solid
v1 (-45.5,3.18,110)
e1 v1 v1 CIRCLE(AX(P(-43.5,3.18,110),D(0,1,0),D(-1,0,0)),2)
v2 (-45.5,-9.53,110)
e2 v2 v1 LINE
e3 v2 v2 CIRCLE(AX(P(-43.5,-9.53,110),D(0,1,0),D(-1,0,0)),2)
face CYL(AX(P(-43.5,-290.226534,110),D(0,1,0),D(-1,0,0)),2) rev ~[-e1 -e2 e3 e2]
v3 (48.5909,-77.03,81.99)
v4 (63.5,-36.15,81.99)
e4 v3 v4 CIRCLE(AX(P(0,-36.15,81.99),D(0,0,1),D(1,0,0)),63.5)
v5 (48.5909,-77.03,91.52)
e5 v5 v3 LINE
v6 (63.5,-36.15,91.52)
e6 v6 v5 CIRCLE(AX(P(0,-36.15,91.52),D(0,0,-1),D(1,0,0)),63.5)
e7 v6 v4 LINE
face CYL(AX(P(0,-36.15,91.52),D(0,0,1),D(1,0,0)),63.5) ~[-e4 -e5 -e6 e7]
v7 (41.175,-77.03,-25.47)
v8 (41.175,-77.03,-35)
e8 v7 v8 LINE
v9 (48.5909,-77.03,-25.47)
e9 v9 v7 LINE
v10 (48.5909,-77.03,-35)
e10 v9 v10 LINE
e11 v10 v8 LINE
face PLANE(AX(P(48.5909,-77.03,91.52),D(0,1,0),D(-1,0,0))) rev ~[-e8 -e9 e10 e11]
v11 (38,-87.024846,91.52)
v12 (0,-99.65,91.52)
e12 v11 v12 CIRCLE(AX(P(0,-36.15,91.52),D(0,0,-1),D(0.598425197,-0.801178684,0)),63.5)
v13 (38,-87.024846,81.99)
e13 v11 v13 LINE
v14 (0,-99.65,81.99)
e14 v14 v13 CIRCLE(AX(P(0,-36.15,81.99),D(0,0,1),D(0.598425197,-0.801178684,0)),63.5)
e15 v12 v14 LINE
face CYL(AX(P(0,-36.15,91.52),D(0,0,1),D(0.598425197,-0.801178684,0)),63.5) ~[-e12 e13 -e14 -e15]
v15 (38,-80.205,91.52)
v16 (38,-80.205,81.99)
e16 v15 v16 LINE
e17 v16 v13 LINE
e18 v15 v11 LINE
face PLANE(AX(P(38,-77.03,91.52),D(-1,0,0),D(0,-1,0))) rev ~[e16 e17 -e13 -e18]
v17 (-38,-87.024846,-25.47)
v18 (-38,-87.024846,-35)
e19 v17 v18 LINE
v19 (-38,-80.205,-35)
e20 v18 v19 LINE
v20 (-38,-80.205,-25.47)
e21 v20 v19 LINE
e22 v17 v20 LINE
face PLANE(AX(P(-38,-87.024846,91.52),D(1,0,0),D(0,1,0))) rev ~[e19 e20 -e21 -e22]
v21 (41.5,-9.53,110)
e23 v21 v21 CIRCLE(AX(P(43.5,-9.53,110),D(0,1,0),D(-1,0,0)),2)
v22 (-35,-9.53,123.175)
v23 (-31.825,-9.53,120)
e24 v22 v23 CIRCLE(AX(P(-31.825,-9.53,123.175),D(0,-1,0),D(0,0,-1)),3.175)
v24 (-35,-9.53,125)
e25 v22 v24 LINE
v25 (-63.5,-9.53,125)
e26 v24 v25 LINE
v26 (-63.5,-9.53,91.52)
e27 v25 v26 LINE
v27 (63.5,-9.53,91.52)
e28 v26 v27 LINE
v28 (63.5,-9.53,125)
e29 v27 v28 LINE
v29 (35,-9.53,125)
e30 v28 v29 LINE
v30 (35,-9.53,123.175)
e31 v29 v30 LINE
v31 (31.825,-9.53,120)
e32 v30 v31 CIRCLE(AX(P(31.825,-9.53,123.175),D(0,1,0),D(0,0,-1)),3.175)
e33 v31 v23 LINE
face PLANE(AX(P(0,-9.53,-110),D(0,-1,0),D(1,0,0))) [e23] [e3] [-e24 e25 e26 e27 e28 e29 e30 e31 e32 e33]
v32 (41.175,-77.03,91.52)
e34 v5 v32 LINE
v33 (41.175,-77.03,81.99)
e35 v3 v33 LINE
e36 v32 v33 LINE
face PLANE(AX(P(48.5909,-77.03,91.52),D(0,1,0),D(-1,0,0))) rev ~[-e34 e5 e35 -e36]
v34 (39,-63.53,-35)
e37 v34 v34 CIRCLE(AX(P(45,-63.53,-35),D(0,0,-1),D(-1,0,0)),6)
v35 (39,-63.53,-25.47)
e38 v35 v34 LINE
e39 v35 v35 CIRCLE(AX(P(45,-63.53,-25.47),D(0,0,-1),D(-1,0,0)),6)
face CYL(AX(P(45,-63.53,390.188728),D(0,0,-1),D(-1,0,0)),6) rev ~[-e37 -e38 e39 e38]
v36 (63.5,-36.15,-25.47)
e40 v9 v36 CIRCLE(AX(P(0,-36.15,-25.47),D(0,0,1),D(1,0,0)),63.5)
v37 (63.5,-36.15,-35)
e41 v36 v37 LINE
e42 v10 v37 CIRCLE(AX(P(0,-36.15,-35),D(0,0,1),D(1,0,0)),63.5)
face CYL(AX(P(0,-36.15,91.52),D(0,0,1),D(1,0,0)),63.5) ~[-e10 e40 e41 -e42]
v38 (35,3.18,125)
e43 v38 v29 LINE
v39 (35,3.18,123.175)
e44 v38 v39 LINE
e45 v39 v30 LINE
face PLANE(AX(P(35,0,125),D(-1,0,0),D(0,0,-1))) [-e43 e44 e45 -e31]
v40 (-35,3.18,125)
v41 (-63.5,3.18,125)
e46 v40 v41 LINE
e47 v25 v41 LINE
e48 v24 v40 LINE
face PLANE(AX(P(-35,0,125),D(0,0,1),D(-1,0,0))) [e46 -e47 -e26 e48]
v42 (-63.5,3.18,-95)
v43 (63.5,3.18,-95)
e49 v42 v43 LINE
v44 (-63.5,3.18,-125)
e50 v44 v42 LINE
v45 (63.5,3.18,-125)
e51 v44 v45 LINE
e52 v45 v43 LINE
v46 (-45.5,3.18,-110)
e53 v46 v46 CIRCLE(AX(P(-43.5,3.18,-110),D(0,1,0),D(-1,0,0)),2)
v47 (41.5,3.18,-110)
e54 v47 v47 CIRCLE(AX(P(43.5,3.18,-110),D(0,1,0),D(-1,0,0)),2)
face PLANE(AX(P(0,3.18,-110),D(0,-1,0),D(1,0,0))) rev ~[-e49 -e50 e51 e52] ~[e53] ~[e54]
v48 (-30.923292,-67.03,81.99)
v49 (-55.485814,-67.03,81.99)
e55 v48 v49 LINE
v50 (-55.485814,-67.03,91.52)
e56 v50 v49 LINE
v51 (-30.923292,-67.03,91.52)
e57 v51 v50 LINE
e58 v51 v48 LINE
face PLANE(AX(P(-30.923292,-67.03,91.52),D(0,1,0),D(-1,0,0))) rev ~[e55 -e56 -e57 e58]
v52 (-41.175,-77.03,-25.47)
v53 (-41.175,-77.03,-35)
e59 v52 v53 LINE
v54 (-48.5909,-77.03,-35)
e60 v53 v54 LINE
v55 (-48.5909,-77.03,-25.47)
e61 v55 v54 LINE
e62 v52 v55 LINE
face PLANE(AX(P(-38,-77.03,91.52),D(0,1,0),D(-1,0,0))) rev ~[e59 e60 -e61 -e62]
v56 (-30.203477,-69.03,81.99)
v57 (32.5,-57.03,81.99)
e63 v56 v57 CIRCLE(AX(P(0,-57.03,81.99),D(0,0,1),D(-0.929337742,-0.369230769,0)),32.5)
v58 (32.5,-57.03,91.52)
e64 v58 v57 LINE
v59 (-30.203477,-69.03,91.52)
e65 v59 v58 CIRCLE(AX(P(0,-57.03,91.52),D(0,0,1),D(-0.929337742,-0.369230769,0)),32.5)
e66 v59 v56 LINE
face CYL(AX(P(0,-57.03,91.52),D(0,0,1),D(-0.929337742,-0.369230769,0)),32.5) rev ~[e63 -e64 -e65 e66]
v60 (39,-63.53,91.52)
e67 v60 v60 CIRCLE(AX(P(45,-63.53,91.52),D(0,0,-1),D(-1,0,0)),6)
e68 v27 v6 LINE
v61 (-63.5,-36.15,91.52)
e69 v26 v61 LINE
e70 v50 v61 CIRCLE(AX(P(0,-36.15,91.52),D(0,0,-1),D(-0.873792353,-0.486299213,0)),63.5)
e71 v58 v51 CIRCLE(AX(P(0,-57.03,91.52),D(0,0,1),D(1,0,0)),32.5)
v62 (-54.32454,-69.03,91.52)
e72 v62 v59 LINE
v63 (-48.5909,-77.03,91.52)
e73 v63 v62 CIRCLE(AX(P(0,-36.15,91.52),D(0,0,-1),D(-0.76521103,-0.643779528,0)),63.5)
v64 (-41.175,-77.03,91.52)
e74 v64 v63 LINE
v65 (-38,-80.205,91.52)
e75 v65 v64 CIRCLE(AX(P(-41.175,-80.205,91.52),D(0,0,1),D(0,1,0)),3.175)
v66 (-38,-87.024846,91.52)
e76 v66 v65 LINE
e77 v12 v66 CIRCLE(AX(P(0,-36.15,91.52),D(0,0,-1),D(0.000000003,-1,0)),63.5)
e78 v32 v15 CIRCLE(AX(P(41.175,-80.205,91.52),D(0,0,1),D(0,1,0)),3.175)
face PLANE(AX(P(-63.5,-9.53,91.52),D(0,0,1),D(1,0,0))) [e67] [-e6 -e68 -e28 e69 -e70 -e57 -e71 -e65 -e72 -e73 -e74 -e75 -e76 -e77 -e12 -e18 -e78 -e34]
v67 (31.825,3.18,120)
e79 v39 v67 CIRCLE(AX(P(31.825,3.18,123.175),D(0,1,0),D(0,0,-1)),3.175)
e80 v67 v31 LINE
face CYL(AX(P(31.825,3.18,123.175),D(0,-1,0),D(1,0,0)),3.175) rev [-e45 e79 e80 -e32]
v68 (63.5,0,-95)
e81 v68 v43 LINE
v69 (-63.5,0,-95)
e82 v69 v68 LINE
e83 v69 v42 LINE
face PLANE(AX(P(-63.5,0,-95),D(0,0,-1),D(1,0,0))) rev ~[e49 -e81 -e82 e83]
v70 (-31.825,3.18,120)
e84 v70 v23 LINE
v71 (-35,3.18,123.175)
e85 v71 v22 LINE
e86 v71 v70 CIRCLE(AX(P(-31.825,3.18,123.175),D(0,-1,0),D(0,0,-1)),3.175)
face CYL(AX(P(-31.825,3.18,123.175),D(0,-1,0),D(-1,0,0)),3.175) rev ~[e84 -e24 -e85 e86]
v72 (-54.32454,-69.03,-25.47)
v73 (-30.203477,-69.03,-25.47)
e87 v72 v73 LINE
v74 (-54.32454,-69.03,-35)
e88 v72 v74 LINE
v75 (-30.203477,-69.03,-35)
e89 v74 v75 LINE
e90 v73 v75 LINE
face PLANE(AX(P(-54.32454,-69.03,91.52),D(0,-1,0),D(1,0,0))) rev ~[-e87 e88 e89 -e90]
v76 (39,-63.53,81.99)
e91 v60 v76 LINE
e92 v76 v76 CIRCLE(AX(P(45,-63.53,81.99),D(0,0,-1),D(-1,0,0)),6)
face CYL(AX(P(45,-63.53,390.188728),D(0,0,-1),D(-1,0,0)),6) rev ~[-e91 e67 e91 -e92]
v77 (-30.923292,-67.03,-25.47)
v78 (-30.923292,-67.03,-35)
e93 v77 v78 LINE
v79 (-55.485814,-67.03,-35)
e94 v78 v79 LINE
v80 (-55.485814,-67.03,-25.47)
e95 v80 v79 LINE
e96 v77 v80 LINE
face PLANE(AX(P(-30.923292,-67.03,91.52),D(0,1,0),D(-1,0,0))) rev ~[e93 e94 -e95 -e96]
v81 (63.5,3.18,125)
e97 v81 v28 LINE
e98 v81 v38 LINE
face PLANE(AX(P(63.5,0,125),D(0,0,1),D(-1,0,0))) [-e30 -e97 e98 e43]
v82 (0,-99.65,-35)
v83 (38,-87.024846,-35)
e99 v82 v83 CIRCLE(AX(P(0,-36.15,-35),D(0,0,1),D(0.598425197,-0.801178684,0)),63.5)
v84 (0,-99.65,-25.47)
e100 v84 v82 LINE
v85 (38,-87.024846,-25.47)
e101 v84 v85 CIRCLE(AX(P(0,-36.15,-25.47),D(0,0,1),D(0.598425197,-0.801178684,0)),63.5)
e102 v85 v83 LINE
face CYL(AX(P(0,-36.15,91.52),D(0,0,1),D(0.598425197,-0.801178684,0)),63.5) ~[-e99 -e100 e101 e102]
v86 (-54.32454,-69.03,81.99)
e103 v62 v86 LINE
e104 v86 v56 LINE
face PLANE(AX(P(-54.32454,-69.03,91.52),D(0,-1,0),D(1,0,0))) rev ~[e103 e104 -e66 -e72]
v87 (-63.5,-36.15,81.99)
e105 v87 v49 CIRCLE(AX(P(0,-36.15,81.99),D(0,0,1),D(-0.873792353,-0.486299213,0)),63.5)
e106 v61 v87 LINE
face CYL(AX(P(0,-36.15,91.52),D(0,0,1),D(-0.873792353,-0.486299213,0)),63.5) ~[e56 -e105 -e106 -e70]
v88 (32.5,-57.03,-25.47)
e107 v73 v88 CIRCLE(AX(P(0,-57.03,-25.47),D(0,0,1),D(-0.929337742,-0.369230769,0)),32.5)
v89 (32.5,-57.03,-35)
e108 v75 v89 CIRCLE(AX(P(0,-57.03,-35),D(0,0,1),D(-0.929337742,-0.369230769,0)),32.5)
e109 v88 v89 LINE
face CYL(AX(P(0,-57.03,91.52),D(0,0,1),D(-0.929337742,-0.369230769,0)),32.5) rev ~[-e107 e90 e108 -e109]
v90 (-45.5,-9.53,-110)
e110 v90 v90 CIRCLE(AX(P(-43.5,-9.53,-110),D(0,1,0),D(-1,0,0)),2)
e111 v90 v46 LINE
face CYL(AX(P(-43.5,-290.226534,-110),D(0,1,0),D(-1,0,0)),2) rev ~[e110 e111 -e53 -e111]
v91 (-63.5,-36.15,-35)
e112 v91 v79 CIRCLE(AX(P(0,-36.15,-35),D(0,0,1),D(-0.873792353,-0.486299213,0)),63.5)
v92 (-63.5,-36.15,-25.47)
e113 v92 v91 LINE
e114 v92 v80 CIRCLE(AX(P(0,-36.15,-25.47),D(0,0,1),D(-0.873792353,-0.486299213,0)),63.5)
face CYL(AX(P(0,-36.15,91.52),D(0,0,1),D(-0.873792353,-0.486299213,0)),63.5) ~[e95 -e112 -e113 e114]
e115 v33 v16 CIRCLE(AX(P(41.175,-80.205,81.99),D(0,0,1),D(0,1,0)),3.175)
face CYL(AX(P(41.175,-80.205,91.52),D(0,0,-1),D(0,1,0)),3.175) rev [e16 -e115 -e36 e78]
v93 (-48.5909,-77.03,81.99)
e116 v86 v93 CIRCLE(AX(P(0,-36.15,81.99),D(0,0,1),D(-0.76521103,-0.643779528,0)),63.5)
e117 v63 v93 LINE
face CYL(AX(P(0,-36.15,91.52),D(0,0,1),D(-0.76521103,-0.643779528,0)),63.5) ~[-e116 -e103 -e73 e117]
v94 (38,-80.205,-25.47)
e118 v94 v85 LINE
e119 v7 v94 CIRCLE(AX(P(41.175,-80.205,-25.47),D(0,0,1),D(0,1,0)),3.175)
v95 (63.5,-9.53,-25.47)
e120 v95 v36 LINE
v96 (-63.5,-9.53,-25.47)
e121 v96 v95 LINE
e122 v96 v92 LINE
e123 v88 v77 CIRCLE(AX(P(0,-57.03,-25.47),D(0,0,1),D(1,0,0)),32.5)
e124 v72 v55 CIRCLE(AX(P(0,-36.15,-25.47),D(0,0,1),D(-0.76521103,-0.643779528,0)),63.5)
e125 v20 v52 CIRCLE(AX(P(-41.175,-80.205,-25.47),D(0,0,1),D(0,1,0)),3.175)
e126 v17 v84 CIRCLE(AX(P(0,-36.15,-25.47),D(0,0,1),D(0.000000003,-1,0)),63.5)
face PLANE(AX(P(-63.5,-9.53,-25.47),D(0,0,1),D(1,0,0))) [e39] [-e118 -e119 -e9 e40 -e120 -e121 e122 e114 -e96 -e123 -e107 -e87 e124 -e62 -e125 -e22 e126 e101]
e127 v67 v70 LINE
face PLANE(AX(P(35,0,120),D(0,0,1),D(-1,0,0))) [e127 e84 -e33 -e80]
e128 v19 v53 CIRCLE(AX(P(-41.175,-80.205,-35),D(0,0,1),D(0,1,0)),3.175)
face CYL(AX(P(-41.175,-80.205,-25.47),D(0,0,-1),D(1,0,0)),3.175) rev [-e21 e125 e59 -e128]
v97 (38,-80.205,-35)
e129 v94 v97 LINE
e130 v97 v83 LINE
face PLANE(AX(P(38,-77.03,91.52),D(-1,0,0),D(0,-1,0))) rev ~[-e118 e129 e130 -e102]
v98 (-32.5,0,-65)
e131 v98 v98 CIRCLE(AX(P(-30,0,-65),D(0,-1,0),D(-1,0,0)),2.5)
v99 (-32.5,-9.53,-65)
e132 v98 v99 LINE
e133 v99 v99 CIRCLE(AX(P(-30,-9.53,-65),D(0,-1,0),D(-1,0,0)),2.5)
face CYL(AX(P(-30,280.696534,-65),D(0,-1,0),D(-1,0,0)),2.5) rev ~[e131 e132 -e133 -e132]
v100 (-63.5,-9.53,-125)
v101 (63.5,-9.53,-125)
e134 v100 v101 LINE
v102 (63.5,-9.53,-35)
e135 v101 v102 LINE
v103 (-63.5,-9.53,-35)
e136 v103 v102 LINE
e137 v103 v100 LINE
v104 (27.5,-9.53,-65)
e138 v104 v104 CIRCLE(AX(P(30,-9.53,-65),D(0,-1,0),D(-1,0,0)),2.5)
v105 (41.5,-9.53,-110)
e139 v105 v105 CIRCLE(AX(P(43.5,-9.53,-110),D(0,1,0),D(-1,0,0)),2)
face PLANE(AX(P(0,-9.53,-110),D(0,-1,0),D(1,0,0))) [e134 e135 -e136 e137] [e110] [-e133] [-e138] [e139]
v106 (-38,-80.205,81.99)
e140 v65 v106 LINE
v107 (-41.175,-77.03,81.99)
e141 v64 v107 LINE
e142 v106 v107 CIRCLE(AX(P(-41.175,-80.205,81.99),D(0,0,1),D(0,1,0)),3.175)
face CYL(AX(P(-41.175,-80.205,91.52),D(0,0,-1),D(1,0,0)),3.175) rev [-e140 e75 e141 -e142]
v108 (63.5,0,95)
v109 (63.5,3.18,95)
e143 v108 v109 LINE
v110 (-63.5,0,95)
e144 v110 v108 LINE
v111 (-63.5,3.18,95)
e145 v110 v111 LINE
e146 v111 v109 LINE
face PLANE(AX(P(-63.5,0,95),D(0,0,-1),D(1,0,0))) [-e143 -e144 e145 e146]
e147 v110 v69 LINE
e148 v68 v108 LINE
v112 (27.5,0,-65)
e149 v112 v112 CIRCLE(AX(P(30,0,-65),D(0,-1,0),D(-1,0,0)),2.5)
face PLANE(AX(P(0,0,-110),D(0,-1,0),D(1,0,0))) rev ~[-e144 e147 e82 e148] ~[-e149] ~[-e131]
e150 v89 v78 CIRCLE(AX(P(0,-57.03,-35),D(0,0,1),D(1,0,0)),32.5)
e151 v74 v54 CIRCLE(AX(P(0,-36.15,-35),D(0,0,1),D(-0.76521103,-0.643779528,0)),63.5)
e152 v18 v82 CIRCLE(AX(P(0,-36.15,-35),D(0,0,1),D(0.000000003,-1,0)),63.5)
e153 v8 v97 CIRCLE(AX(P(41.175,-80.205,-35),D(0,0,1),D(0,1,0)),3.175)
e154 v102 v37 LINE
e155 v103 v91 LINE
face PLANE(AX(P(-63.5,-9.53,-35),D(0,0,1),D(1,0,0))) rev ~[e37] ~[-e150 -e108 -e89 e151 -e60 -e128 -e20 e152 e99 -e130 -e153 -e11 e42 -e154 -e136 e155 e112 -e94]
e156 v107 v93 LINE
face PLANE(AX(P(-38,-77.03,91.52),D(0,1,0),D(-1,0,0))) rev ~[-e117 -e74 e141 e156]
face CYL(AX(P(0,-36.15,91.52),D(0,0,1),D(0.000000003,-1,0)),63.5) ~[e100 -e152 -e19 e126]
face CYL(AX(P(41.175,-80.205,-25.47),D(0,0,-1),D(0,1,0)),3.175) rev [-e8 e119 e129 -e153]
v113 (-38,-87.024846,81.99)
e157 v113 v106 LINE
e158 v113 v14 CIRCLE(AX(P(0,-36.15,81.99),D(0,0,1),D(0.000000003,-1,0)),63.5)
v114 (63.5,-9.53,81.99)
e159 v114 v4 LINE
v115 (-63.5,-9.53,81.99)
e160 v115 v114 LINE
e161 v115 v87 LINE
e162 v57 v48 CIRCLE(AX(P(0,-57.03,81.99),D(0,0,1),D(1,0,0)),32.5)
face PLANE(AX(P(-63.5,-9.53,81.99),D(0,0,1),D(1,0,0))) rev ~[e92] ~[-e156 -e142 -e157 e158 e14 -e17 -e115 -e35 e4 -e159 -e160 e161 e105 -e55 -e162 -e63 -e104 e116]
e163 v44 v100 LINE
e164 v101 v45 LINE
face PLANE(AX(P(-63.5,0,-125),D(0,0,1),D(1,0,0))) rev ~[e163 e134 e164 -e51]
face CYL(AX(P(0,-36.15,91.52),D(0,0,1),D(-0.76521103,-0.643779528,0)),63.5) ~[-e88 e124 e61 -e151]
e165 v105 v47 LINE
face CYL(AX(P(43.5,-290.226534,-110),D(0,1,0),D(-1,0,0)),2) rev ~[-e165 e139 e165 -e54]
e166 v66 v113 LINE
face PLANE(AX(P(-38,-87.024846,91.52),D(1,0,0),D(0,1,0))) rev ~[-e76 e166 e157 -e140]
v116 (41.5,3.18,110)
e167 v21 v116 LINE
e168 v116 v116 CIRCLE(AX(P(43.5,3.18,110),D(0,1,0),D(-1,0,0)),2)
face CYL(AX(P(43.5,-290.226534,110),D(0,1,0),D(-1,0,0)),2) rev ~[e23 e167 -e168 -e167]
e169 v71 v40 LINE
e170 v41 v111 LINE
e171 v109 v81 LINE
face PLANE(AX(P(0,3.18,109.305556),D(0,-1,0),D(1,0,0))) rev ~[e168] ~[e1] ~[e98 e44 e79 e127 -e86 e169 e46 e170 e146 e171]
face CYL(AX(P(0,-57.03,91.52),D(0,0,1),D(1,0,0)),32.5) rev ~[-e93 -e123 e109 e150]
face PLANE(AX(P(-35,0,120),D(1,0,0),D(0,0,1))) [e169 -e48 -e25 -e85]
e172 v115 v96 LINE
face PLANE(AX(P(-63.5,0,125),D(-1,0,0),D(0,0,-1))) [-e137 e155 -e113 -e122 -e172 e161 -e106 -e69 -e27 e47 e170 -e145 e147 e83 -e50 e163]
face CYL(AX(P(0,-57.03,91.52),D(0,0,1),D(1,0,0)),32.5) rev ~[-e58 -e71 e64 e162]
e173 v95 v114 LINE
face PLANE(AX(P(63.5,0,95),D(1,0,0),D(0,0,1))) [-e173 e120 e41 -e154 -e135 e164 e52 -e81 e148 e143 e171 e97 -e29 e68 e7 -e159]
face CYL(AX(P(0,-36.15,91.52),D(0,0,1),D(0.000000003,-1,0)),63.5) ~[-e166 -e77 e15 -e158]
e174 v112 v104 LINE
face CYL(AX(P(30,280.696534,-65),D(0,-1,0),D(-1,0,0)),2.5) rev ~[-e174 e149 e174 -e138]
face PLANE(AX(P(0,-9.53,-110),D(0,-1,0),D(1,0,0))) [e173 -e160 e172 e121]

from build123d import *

# Parameters (mm, degrees)
F0_W     = 127
F0_H     = 30
F0_H_2   = 190
F1_DEPTH = 9.53
F2_DEPTH = 3.18
F4_D     = 4
F5_D     = 5
F3_W     = 127
F3_H     = 9.53
F6_DEPTH = 90.12
F8_DEPTH = 216.521
F9_D     = 12
F10_R    = 3.175


with BuildPart() as f1:
    # F0 (on Front) → F1 (new body)
    with BuildSketch(Plane.XZ):
        with Locations((0, -110)):
            Rectangle(F0_W, F0_H)
        Rectangle(F0_W, F0_H_2)
        Polygon((-63.5, 95), (63.5, 95), (63.5, 125), (35, 125), (35, 120), (-35, 120), (-35, 125), (-63.5, 125), align=None)
    extrude(amount=F1_DEPTH)

    # F0 (on Front) → F2 (join)
    with BuildSketch(Plane.XZ):
        Polygon((-63.5, 95), (63.5, 95), (63.5, 125), (35, 125), (35, 120), (-35, 120), (-35, 125), (-63.5, 125), align=None)
        with Locations((0, -110)):
            Rectangle(F0_W, F0_H)
    extrude(amount=-F2_DEPTH)

    # F4 (through all)
    with Locations(Plane.XZ.offset(9.53)):
        with Locations((-43.5, 110), (43.5, 110), (-43.5, -110), (43.5, -110)):
            Hole(F4_D / 2)

    # F5 (through all)
    with Locations(Plane(origin=(0, 0, 0), x_dir=(1, 0, 0), z_dir=(0, 1, 0))):
        with Locations((-30, 65), (30, 65)):
            Hole(F5_D / 2)

    # F3 (on face) → F6 (join)
    with BuildSketch(Plane.XZ.offset(9.53)):
        with Locations((0, 86.755)):
            Rectangle(F3_W, F3_H)
        with Locations((0, -30.235)):
            Rectangle(F3_W, F3_H)
    extrude(amount=F6_DEPTH)

    # F7 (on face) → F8 (cut, through all)
    with BuildSketch(Plane.XY.offset(91.52)):
        with BuildLine():
            Line((-30.2034766211, -69.03), (-30.9232921921, -67.03))
            ThreePointArc((-30.9232921921, -67.03), (-30.5797394754, -68.0358863166), (-30.2034766211, -69.03))
        make_face()
        with BuildLine():
            ThreePointArc((-30.2034766211, -69.03), (6.1088873707, -88.9507063689), (32.5, -57.03))
            ThreePointArc((32.5, -57.03), (-5.0617686512, -24.9265967829), (-30.9232921921, -67.03))
            Line((-30.9232921921, -67.03), (-30.2034766211, -69.03))
        make_face()
        with BuildLine():
            ThreePointArc((-54.3245395747, -69.03), (-54.9142828433, -68.0352871997), (-55.4858144033, -67.03))
            ThreePointArc((-55.4858144033, -67.03), (-61.4638072959, -52.1015012677), (-63.5, -36.15))
            Line((-63.5, -36.15), (-63.5, -99.65))
            Line((-63.5, -99.65), (2.176e-07, -99.65))
            ThreePointArc((2.176e-07, -99.65), (-20.0212042966, -96.4111100007), (-38, -87.0248464371))
            ThreePointArc((-38, -87.0248464371), (-43.5829123177, -82.3320284732), (-48.5909003827, -77.03))
            ThreePointArc((-48.5909003827, -77.03), (-51.6129532715, -73.1412564614), (-54.3245395747, -69.03))
        make_face()
        with BuildLine():
            ThreePointArc((38, -87.0248464371), (20.0212045031, -96.4111099321), (2.176e-07, -99.65))
            Line((2.176e-07, -99.65), (63.5, -99.65))
            Line((63.5, -99.65), (63.5, -36.15))
            ThreePointArc((63.5, -36.15), (59.6564002195, -57.9069279277), (48.5909003827, -77.03))
            ThreePointArc((48.5909003827, -77.03), (43.5829123177, -82.3320284732), (38, -87.0248464371))
        make_face()
        with BuildLine():
            Line((-38, -77.03), (-48.5909003827, -77.03))
            ThreePointArc((-48.5909003827, -77.03), (-43.5829123177, -82.3320284732), (-38, -87.0248464371))
            Line((-38, -87.0248464371), (-38, -77.03))
        make_face()
        with BuildLine():
            Line((38, -77.03), (38, -87.0248464371))
            ThreePointArc((38, -87.0248464371), (43.5829123177, -82.3320284732), (48.5909003827, -77.03))
            Line((48.5909003827, -77.03), (38, -77.03))
        make_face()
        with BuildLine():
            ThreePointArc((-30.2034766211, -69.03), (-30.5797394754, -68.0358863166), (-30.9232921921, -67.03))
            Line((-30.9232921921, -67.03), (-55.4858144033, -67.03))
            ThreePointArc((-55.4858144033, -67.03), (-54.9142828433, -68.0352871997), (-54.3245395747, -69.03))
            Line((-54.3245395747, -69.03), (-30.2034766211, -69.03))
        make_face()
    extrude(amount=-F8_DEPTH, mode=Mode.SUBTRACT)

    # F9 (through all)
    with Locations(Plane.XY.offset(91.52)):
        with Locations((45, -63.53)):
            Hole(F9_D / 2)

    # F10
    f10_edges = [f1.edges().sort_by_distance(p)[0] for p in [
        (-38, -77.03, 86.755),
        (-38, -77.03, -30.235),
        (38, -77.03, -30.235),
        (38, -77.03, 86.755),
        (-35, -3.175, 120),
        (35, -3.175, 120),
    ]]
    fillet(f10_edges, radius=F10_R)


solid = f1.part
